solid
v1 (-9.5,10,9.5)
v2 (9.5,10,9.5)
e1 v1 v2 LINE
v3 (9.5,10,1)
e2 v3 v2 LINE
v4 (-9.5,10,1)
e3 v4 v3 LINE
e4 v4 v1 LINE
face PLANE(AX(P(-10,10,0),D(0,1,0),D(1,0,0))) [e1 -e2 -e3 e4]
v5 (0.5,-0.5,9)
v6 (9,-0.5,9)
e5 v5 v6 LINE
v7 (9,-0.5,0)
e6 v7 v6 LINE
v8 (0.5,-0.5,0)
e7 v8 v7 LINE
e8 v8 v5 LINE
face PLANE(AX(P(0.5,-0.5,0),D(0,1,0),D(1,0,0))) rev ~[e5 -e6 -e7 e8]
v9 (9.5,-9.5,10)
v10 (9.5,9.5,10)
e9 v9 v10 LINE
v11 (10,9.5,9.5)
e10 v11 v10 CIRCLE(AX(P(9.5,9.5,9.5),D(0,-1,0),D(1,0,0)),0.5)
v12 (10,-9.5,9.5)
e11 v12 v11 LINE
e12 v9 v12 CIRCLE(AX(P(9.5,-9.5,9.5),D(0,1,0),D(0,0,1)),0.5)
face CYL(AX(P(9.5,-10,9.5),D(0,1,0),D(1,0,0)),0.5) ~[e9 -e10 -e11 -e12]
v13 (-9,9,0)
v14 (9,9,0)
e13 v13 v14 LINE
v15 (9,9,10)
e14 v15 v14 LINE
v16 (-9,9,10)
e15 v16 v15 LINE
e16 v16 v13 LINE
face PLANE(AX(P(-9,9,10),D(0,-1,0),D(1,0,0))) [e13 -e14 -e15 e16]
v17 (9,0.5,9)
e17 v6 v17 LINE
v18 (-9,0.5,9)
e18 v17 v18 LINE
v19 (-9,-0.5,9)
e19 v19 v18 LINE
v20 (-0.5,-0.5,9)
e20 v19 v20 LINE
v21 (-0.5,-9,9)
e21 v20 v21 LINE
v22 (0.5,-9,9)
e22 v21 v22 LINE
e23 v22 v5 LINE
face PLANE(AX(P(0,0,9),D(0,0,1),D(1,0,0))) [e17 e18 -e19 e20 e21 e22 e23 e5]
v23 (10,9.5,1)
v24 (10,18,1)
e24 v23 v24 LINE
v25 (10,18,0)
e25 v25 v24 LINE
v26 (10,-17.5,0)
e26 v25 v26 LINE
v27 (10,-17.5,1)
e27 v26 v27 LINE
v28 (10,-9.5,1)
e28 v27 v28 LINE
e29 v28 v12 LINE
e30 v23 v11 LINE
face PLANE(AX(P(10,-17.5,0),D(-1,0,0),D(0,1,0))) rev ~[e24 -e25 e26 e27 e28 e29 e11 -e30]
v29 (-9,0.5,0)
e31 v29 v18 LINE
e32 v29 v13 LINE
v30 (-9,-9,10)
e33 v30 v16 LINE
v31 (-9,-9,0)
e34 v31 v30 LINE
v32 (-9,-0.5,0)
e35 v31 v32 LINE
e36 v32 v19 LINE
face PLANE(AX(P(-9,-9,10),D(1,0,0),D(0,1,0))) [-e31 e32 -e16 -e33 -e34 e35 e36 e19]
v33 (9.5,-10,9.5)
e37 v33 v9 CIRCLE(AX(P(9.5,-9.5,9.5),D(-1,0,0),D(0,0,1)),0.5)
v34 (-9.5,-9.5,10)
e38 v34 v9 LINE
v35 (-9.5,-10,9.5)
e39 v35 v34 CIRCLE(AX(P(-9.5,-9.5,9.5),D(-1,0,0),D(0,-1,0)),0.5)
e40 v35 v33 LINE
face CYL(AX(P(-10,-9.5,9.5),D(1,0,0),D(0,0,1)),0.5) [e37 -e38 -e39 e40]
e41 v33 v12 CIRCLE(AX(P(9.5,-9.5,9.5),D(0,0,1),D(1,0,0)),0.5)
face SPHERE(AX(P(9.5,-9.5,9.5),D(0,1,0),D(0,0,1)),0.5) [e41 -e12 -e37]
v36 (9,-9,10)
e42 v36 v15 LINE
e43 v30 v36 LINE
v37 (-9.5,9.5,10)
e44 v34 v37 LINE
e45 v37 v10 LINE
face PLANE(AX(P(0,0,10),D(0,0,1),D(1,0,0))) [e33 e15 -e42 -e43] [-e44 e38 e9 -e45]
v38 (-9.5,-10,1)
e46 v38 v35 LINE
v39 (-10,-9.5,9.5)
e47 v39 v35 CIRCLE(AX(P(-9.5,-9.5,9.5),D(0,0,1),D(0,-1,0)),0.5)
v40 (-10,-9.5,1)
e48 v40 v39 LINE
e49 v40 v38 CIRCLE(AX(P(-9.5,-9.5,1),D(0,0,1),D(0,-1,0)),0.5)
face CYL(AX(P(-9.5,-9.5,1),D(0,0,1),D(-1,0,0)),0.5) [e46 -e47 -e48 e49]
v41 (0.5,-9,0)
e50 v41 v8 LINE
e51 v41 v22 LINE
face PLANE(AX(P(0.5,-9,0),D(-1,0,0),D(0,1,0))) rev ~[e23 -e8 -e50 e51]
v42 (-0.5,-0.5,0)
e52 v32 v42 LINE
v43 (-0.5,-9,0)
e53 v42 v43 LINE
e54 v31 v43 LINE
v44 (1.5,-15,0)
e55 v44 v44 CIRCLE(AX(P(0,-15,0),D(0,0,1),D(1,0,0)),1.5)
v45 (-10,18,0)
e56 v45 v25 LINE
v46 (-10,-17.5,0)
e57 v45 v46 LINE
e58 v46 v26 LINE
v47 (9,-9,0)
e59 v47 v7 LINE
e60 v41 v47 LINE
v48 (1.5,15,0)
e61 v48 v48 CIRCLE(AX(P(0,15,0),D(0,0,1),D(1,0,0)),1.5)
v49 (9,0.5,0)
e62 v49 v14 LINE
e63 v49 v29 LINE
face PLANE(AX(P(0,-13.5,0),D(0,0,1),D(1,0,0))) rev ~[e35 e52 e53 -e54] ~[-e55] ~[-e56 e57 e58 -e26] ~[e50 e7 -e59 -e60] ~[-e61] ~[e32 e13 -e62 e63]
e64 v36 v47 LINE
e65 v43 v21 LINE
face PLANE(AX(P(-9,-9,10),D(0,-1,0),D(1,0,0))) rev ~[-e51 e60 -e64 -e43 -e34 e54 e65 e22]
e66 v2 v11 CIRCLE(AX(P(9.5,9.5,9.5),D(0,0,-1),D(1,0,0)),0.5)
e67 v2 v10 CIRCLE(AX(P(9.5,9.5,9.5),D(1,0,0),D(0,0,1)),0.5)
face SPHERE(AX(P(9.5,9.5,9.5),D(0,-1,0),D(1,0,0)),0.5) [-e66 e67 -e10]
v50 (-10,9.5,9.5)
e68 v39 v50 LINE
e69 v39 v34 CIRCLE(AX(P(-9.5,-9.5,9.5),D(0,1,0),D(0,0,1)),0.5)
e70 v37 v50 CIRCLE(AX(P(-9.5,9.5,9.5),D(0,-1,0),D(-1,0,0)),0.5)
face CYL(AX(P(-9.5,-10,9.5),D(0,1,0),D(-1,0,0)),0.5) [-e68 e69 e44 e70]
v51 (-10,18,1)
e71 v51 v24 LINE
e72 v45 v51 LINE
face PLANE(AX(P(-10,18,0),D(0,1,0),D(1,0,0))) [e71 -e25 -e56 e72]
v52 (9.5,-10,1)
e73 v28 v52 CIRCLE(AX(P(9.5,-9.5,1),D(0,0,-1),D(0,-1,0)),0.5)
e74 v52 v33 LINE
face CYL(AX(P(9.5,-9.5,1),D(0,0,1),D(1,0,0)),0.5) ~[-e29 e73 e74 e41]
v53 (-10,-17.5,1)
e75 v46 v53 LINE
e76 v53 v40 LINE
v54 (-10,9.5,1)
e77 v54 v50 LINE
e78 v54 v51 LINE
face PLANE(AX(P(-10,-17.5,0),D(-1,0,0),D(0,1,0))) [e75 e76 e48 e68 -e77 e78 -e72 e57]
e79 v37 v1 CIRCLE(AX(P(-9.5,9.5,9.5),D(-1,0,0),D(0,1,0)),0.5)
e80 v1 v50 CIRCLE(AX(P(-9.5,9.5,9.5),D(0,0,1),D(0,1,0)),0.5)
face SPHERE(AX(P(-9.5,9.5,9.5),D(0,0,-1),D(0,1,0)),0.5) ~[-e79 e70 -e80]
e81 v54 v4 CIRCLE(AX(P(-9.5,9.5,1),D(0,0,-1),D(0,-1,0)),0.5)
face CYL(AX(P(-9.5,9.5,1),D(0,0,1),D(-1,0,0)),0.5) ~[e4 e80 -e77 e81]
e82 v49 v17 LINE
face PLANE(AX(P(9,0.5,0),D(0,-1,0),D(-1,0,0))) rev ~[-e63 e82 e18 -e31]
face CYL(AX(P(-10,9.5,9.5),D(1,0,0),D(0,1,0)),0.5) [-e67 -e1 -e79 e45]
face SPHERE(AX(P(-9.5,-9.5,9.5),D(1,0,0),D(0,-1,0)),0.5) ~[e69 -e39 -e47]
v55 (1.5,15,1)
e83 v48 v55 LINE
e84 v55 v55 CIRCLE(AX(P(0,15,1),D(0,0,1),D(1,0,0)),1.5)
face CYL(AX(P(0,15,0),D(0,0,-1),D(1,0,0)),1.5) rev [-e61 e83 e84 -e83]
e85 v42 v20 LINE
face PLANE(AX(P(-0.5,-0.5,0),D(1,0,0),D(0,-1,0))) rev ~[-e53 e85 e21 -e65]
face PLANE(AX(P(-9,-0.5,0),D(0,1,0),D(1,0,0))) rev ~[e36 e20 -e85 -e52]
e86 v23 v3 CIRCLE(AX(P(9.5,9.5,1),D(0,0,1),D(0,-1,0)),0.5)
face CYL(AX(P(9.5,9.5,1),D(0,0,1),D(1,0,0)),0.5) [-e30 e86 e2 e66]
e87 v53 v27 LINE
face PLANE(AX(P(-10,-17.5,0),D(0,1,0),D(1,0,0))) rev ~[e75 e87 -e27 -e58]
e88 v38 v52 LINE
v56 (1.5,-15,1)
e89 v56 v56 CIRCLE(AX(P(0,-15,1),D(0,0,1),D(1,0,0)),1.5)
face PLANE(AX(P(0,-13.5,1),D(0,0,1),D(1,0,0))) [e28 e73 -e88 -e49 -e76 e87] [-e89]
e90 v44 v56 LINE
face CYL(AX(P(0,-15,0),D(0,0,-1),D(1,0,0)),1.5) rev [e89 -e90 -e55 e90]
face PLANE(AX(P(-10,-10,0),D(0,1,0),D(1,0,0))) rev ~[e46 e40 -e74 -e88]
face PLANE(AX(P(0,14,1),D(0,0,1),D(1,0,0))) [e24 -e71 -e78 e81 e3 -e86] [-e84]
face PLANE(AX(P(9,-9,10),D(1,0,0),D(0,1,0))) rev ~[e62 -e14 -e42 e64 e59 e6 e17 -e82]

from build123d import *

# Parameters (mm, degrees)
F0_W     = 20
F0_H     = 20
F1_DEPTH = 10
F2_T     = -1
F4_DEPTH = 9
F5_W     = 20
F5_H     = 8
F5_R     = 1.5
F6_DEPTH = 1
F7_W     = 18
F7_H     = 18
F8_DEPTH = 1
F9_R     = 0.5


with BuildPart() as f1:
    # F0 (on Top) → F1 (new body)
    with BuildSketch(Plane.XY):
        Rectangle(F0_W, F0_H)
    extrude(amount=F1_DEPTH)

    # F2
    f2_openings = [f1.faces().sort_by_distance(p)[0] for p in [
        (0, 0, 0),
    ]]
    offset(amount=F2_T, openings=f2_openings)

    # F3 (on Top) → F4 (join)
    with BuildSketch(Plane.XY):
        Polygon((-0.5, -9), (0.5, -9), (0.5, -0.5), (9, -0.5), (9, 0.5), (0.5, 0.5), (-0.5, 0.5), (-9, 0.5), (-9, -0.5), (-0.5, -0.5), align=None)
    extrude(amount=F4_DEPTH)

    # F5 (on Top) → F6 (join)
    with BuildSketch(Plane.XY):
        with Locations((0, -13.5)):
            Rectangle(F5_W, F5_H)
        with Locations((0, -15)):
            Circle(F5_R, mode=Mode.SUBTRACT)
        with Locations((0, 14)):
            Rectangle(F5_W, F5_H)
        with Locations((0, 15)):
            Circle(F5_R, mode=Mode.SUBTRACT)
    extrude(amount=F6_DEPTH)

    # F7 (on face) → F8 (cut)
    with BuildSketch(Plane.XY.offset(10)):
        Rectangle(F7_W, F7_H)
    extrude(amount=-F8_DEPTH, mode=Mode.SUBTRACT)

    # F9
    f9_edges = [f1.edges().sort_by_distance(p)[0] for p in [
        (10, 0, 10),
        (0, -10, 10),
        (10, -10, 5.5),
        (-10, -10, 5.5),
        (10, 10, 5.5),
        (-10, 10, 5.5),
        (0, 10, 10),
        (-10, 0, 10),
    ]]
    fillet(f9_edges, radius=F9_R)


solid = f1.part
